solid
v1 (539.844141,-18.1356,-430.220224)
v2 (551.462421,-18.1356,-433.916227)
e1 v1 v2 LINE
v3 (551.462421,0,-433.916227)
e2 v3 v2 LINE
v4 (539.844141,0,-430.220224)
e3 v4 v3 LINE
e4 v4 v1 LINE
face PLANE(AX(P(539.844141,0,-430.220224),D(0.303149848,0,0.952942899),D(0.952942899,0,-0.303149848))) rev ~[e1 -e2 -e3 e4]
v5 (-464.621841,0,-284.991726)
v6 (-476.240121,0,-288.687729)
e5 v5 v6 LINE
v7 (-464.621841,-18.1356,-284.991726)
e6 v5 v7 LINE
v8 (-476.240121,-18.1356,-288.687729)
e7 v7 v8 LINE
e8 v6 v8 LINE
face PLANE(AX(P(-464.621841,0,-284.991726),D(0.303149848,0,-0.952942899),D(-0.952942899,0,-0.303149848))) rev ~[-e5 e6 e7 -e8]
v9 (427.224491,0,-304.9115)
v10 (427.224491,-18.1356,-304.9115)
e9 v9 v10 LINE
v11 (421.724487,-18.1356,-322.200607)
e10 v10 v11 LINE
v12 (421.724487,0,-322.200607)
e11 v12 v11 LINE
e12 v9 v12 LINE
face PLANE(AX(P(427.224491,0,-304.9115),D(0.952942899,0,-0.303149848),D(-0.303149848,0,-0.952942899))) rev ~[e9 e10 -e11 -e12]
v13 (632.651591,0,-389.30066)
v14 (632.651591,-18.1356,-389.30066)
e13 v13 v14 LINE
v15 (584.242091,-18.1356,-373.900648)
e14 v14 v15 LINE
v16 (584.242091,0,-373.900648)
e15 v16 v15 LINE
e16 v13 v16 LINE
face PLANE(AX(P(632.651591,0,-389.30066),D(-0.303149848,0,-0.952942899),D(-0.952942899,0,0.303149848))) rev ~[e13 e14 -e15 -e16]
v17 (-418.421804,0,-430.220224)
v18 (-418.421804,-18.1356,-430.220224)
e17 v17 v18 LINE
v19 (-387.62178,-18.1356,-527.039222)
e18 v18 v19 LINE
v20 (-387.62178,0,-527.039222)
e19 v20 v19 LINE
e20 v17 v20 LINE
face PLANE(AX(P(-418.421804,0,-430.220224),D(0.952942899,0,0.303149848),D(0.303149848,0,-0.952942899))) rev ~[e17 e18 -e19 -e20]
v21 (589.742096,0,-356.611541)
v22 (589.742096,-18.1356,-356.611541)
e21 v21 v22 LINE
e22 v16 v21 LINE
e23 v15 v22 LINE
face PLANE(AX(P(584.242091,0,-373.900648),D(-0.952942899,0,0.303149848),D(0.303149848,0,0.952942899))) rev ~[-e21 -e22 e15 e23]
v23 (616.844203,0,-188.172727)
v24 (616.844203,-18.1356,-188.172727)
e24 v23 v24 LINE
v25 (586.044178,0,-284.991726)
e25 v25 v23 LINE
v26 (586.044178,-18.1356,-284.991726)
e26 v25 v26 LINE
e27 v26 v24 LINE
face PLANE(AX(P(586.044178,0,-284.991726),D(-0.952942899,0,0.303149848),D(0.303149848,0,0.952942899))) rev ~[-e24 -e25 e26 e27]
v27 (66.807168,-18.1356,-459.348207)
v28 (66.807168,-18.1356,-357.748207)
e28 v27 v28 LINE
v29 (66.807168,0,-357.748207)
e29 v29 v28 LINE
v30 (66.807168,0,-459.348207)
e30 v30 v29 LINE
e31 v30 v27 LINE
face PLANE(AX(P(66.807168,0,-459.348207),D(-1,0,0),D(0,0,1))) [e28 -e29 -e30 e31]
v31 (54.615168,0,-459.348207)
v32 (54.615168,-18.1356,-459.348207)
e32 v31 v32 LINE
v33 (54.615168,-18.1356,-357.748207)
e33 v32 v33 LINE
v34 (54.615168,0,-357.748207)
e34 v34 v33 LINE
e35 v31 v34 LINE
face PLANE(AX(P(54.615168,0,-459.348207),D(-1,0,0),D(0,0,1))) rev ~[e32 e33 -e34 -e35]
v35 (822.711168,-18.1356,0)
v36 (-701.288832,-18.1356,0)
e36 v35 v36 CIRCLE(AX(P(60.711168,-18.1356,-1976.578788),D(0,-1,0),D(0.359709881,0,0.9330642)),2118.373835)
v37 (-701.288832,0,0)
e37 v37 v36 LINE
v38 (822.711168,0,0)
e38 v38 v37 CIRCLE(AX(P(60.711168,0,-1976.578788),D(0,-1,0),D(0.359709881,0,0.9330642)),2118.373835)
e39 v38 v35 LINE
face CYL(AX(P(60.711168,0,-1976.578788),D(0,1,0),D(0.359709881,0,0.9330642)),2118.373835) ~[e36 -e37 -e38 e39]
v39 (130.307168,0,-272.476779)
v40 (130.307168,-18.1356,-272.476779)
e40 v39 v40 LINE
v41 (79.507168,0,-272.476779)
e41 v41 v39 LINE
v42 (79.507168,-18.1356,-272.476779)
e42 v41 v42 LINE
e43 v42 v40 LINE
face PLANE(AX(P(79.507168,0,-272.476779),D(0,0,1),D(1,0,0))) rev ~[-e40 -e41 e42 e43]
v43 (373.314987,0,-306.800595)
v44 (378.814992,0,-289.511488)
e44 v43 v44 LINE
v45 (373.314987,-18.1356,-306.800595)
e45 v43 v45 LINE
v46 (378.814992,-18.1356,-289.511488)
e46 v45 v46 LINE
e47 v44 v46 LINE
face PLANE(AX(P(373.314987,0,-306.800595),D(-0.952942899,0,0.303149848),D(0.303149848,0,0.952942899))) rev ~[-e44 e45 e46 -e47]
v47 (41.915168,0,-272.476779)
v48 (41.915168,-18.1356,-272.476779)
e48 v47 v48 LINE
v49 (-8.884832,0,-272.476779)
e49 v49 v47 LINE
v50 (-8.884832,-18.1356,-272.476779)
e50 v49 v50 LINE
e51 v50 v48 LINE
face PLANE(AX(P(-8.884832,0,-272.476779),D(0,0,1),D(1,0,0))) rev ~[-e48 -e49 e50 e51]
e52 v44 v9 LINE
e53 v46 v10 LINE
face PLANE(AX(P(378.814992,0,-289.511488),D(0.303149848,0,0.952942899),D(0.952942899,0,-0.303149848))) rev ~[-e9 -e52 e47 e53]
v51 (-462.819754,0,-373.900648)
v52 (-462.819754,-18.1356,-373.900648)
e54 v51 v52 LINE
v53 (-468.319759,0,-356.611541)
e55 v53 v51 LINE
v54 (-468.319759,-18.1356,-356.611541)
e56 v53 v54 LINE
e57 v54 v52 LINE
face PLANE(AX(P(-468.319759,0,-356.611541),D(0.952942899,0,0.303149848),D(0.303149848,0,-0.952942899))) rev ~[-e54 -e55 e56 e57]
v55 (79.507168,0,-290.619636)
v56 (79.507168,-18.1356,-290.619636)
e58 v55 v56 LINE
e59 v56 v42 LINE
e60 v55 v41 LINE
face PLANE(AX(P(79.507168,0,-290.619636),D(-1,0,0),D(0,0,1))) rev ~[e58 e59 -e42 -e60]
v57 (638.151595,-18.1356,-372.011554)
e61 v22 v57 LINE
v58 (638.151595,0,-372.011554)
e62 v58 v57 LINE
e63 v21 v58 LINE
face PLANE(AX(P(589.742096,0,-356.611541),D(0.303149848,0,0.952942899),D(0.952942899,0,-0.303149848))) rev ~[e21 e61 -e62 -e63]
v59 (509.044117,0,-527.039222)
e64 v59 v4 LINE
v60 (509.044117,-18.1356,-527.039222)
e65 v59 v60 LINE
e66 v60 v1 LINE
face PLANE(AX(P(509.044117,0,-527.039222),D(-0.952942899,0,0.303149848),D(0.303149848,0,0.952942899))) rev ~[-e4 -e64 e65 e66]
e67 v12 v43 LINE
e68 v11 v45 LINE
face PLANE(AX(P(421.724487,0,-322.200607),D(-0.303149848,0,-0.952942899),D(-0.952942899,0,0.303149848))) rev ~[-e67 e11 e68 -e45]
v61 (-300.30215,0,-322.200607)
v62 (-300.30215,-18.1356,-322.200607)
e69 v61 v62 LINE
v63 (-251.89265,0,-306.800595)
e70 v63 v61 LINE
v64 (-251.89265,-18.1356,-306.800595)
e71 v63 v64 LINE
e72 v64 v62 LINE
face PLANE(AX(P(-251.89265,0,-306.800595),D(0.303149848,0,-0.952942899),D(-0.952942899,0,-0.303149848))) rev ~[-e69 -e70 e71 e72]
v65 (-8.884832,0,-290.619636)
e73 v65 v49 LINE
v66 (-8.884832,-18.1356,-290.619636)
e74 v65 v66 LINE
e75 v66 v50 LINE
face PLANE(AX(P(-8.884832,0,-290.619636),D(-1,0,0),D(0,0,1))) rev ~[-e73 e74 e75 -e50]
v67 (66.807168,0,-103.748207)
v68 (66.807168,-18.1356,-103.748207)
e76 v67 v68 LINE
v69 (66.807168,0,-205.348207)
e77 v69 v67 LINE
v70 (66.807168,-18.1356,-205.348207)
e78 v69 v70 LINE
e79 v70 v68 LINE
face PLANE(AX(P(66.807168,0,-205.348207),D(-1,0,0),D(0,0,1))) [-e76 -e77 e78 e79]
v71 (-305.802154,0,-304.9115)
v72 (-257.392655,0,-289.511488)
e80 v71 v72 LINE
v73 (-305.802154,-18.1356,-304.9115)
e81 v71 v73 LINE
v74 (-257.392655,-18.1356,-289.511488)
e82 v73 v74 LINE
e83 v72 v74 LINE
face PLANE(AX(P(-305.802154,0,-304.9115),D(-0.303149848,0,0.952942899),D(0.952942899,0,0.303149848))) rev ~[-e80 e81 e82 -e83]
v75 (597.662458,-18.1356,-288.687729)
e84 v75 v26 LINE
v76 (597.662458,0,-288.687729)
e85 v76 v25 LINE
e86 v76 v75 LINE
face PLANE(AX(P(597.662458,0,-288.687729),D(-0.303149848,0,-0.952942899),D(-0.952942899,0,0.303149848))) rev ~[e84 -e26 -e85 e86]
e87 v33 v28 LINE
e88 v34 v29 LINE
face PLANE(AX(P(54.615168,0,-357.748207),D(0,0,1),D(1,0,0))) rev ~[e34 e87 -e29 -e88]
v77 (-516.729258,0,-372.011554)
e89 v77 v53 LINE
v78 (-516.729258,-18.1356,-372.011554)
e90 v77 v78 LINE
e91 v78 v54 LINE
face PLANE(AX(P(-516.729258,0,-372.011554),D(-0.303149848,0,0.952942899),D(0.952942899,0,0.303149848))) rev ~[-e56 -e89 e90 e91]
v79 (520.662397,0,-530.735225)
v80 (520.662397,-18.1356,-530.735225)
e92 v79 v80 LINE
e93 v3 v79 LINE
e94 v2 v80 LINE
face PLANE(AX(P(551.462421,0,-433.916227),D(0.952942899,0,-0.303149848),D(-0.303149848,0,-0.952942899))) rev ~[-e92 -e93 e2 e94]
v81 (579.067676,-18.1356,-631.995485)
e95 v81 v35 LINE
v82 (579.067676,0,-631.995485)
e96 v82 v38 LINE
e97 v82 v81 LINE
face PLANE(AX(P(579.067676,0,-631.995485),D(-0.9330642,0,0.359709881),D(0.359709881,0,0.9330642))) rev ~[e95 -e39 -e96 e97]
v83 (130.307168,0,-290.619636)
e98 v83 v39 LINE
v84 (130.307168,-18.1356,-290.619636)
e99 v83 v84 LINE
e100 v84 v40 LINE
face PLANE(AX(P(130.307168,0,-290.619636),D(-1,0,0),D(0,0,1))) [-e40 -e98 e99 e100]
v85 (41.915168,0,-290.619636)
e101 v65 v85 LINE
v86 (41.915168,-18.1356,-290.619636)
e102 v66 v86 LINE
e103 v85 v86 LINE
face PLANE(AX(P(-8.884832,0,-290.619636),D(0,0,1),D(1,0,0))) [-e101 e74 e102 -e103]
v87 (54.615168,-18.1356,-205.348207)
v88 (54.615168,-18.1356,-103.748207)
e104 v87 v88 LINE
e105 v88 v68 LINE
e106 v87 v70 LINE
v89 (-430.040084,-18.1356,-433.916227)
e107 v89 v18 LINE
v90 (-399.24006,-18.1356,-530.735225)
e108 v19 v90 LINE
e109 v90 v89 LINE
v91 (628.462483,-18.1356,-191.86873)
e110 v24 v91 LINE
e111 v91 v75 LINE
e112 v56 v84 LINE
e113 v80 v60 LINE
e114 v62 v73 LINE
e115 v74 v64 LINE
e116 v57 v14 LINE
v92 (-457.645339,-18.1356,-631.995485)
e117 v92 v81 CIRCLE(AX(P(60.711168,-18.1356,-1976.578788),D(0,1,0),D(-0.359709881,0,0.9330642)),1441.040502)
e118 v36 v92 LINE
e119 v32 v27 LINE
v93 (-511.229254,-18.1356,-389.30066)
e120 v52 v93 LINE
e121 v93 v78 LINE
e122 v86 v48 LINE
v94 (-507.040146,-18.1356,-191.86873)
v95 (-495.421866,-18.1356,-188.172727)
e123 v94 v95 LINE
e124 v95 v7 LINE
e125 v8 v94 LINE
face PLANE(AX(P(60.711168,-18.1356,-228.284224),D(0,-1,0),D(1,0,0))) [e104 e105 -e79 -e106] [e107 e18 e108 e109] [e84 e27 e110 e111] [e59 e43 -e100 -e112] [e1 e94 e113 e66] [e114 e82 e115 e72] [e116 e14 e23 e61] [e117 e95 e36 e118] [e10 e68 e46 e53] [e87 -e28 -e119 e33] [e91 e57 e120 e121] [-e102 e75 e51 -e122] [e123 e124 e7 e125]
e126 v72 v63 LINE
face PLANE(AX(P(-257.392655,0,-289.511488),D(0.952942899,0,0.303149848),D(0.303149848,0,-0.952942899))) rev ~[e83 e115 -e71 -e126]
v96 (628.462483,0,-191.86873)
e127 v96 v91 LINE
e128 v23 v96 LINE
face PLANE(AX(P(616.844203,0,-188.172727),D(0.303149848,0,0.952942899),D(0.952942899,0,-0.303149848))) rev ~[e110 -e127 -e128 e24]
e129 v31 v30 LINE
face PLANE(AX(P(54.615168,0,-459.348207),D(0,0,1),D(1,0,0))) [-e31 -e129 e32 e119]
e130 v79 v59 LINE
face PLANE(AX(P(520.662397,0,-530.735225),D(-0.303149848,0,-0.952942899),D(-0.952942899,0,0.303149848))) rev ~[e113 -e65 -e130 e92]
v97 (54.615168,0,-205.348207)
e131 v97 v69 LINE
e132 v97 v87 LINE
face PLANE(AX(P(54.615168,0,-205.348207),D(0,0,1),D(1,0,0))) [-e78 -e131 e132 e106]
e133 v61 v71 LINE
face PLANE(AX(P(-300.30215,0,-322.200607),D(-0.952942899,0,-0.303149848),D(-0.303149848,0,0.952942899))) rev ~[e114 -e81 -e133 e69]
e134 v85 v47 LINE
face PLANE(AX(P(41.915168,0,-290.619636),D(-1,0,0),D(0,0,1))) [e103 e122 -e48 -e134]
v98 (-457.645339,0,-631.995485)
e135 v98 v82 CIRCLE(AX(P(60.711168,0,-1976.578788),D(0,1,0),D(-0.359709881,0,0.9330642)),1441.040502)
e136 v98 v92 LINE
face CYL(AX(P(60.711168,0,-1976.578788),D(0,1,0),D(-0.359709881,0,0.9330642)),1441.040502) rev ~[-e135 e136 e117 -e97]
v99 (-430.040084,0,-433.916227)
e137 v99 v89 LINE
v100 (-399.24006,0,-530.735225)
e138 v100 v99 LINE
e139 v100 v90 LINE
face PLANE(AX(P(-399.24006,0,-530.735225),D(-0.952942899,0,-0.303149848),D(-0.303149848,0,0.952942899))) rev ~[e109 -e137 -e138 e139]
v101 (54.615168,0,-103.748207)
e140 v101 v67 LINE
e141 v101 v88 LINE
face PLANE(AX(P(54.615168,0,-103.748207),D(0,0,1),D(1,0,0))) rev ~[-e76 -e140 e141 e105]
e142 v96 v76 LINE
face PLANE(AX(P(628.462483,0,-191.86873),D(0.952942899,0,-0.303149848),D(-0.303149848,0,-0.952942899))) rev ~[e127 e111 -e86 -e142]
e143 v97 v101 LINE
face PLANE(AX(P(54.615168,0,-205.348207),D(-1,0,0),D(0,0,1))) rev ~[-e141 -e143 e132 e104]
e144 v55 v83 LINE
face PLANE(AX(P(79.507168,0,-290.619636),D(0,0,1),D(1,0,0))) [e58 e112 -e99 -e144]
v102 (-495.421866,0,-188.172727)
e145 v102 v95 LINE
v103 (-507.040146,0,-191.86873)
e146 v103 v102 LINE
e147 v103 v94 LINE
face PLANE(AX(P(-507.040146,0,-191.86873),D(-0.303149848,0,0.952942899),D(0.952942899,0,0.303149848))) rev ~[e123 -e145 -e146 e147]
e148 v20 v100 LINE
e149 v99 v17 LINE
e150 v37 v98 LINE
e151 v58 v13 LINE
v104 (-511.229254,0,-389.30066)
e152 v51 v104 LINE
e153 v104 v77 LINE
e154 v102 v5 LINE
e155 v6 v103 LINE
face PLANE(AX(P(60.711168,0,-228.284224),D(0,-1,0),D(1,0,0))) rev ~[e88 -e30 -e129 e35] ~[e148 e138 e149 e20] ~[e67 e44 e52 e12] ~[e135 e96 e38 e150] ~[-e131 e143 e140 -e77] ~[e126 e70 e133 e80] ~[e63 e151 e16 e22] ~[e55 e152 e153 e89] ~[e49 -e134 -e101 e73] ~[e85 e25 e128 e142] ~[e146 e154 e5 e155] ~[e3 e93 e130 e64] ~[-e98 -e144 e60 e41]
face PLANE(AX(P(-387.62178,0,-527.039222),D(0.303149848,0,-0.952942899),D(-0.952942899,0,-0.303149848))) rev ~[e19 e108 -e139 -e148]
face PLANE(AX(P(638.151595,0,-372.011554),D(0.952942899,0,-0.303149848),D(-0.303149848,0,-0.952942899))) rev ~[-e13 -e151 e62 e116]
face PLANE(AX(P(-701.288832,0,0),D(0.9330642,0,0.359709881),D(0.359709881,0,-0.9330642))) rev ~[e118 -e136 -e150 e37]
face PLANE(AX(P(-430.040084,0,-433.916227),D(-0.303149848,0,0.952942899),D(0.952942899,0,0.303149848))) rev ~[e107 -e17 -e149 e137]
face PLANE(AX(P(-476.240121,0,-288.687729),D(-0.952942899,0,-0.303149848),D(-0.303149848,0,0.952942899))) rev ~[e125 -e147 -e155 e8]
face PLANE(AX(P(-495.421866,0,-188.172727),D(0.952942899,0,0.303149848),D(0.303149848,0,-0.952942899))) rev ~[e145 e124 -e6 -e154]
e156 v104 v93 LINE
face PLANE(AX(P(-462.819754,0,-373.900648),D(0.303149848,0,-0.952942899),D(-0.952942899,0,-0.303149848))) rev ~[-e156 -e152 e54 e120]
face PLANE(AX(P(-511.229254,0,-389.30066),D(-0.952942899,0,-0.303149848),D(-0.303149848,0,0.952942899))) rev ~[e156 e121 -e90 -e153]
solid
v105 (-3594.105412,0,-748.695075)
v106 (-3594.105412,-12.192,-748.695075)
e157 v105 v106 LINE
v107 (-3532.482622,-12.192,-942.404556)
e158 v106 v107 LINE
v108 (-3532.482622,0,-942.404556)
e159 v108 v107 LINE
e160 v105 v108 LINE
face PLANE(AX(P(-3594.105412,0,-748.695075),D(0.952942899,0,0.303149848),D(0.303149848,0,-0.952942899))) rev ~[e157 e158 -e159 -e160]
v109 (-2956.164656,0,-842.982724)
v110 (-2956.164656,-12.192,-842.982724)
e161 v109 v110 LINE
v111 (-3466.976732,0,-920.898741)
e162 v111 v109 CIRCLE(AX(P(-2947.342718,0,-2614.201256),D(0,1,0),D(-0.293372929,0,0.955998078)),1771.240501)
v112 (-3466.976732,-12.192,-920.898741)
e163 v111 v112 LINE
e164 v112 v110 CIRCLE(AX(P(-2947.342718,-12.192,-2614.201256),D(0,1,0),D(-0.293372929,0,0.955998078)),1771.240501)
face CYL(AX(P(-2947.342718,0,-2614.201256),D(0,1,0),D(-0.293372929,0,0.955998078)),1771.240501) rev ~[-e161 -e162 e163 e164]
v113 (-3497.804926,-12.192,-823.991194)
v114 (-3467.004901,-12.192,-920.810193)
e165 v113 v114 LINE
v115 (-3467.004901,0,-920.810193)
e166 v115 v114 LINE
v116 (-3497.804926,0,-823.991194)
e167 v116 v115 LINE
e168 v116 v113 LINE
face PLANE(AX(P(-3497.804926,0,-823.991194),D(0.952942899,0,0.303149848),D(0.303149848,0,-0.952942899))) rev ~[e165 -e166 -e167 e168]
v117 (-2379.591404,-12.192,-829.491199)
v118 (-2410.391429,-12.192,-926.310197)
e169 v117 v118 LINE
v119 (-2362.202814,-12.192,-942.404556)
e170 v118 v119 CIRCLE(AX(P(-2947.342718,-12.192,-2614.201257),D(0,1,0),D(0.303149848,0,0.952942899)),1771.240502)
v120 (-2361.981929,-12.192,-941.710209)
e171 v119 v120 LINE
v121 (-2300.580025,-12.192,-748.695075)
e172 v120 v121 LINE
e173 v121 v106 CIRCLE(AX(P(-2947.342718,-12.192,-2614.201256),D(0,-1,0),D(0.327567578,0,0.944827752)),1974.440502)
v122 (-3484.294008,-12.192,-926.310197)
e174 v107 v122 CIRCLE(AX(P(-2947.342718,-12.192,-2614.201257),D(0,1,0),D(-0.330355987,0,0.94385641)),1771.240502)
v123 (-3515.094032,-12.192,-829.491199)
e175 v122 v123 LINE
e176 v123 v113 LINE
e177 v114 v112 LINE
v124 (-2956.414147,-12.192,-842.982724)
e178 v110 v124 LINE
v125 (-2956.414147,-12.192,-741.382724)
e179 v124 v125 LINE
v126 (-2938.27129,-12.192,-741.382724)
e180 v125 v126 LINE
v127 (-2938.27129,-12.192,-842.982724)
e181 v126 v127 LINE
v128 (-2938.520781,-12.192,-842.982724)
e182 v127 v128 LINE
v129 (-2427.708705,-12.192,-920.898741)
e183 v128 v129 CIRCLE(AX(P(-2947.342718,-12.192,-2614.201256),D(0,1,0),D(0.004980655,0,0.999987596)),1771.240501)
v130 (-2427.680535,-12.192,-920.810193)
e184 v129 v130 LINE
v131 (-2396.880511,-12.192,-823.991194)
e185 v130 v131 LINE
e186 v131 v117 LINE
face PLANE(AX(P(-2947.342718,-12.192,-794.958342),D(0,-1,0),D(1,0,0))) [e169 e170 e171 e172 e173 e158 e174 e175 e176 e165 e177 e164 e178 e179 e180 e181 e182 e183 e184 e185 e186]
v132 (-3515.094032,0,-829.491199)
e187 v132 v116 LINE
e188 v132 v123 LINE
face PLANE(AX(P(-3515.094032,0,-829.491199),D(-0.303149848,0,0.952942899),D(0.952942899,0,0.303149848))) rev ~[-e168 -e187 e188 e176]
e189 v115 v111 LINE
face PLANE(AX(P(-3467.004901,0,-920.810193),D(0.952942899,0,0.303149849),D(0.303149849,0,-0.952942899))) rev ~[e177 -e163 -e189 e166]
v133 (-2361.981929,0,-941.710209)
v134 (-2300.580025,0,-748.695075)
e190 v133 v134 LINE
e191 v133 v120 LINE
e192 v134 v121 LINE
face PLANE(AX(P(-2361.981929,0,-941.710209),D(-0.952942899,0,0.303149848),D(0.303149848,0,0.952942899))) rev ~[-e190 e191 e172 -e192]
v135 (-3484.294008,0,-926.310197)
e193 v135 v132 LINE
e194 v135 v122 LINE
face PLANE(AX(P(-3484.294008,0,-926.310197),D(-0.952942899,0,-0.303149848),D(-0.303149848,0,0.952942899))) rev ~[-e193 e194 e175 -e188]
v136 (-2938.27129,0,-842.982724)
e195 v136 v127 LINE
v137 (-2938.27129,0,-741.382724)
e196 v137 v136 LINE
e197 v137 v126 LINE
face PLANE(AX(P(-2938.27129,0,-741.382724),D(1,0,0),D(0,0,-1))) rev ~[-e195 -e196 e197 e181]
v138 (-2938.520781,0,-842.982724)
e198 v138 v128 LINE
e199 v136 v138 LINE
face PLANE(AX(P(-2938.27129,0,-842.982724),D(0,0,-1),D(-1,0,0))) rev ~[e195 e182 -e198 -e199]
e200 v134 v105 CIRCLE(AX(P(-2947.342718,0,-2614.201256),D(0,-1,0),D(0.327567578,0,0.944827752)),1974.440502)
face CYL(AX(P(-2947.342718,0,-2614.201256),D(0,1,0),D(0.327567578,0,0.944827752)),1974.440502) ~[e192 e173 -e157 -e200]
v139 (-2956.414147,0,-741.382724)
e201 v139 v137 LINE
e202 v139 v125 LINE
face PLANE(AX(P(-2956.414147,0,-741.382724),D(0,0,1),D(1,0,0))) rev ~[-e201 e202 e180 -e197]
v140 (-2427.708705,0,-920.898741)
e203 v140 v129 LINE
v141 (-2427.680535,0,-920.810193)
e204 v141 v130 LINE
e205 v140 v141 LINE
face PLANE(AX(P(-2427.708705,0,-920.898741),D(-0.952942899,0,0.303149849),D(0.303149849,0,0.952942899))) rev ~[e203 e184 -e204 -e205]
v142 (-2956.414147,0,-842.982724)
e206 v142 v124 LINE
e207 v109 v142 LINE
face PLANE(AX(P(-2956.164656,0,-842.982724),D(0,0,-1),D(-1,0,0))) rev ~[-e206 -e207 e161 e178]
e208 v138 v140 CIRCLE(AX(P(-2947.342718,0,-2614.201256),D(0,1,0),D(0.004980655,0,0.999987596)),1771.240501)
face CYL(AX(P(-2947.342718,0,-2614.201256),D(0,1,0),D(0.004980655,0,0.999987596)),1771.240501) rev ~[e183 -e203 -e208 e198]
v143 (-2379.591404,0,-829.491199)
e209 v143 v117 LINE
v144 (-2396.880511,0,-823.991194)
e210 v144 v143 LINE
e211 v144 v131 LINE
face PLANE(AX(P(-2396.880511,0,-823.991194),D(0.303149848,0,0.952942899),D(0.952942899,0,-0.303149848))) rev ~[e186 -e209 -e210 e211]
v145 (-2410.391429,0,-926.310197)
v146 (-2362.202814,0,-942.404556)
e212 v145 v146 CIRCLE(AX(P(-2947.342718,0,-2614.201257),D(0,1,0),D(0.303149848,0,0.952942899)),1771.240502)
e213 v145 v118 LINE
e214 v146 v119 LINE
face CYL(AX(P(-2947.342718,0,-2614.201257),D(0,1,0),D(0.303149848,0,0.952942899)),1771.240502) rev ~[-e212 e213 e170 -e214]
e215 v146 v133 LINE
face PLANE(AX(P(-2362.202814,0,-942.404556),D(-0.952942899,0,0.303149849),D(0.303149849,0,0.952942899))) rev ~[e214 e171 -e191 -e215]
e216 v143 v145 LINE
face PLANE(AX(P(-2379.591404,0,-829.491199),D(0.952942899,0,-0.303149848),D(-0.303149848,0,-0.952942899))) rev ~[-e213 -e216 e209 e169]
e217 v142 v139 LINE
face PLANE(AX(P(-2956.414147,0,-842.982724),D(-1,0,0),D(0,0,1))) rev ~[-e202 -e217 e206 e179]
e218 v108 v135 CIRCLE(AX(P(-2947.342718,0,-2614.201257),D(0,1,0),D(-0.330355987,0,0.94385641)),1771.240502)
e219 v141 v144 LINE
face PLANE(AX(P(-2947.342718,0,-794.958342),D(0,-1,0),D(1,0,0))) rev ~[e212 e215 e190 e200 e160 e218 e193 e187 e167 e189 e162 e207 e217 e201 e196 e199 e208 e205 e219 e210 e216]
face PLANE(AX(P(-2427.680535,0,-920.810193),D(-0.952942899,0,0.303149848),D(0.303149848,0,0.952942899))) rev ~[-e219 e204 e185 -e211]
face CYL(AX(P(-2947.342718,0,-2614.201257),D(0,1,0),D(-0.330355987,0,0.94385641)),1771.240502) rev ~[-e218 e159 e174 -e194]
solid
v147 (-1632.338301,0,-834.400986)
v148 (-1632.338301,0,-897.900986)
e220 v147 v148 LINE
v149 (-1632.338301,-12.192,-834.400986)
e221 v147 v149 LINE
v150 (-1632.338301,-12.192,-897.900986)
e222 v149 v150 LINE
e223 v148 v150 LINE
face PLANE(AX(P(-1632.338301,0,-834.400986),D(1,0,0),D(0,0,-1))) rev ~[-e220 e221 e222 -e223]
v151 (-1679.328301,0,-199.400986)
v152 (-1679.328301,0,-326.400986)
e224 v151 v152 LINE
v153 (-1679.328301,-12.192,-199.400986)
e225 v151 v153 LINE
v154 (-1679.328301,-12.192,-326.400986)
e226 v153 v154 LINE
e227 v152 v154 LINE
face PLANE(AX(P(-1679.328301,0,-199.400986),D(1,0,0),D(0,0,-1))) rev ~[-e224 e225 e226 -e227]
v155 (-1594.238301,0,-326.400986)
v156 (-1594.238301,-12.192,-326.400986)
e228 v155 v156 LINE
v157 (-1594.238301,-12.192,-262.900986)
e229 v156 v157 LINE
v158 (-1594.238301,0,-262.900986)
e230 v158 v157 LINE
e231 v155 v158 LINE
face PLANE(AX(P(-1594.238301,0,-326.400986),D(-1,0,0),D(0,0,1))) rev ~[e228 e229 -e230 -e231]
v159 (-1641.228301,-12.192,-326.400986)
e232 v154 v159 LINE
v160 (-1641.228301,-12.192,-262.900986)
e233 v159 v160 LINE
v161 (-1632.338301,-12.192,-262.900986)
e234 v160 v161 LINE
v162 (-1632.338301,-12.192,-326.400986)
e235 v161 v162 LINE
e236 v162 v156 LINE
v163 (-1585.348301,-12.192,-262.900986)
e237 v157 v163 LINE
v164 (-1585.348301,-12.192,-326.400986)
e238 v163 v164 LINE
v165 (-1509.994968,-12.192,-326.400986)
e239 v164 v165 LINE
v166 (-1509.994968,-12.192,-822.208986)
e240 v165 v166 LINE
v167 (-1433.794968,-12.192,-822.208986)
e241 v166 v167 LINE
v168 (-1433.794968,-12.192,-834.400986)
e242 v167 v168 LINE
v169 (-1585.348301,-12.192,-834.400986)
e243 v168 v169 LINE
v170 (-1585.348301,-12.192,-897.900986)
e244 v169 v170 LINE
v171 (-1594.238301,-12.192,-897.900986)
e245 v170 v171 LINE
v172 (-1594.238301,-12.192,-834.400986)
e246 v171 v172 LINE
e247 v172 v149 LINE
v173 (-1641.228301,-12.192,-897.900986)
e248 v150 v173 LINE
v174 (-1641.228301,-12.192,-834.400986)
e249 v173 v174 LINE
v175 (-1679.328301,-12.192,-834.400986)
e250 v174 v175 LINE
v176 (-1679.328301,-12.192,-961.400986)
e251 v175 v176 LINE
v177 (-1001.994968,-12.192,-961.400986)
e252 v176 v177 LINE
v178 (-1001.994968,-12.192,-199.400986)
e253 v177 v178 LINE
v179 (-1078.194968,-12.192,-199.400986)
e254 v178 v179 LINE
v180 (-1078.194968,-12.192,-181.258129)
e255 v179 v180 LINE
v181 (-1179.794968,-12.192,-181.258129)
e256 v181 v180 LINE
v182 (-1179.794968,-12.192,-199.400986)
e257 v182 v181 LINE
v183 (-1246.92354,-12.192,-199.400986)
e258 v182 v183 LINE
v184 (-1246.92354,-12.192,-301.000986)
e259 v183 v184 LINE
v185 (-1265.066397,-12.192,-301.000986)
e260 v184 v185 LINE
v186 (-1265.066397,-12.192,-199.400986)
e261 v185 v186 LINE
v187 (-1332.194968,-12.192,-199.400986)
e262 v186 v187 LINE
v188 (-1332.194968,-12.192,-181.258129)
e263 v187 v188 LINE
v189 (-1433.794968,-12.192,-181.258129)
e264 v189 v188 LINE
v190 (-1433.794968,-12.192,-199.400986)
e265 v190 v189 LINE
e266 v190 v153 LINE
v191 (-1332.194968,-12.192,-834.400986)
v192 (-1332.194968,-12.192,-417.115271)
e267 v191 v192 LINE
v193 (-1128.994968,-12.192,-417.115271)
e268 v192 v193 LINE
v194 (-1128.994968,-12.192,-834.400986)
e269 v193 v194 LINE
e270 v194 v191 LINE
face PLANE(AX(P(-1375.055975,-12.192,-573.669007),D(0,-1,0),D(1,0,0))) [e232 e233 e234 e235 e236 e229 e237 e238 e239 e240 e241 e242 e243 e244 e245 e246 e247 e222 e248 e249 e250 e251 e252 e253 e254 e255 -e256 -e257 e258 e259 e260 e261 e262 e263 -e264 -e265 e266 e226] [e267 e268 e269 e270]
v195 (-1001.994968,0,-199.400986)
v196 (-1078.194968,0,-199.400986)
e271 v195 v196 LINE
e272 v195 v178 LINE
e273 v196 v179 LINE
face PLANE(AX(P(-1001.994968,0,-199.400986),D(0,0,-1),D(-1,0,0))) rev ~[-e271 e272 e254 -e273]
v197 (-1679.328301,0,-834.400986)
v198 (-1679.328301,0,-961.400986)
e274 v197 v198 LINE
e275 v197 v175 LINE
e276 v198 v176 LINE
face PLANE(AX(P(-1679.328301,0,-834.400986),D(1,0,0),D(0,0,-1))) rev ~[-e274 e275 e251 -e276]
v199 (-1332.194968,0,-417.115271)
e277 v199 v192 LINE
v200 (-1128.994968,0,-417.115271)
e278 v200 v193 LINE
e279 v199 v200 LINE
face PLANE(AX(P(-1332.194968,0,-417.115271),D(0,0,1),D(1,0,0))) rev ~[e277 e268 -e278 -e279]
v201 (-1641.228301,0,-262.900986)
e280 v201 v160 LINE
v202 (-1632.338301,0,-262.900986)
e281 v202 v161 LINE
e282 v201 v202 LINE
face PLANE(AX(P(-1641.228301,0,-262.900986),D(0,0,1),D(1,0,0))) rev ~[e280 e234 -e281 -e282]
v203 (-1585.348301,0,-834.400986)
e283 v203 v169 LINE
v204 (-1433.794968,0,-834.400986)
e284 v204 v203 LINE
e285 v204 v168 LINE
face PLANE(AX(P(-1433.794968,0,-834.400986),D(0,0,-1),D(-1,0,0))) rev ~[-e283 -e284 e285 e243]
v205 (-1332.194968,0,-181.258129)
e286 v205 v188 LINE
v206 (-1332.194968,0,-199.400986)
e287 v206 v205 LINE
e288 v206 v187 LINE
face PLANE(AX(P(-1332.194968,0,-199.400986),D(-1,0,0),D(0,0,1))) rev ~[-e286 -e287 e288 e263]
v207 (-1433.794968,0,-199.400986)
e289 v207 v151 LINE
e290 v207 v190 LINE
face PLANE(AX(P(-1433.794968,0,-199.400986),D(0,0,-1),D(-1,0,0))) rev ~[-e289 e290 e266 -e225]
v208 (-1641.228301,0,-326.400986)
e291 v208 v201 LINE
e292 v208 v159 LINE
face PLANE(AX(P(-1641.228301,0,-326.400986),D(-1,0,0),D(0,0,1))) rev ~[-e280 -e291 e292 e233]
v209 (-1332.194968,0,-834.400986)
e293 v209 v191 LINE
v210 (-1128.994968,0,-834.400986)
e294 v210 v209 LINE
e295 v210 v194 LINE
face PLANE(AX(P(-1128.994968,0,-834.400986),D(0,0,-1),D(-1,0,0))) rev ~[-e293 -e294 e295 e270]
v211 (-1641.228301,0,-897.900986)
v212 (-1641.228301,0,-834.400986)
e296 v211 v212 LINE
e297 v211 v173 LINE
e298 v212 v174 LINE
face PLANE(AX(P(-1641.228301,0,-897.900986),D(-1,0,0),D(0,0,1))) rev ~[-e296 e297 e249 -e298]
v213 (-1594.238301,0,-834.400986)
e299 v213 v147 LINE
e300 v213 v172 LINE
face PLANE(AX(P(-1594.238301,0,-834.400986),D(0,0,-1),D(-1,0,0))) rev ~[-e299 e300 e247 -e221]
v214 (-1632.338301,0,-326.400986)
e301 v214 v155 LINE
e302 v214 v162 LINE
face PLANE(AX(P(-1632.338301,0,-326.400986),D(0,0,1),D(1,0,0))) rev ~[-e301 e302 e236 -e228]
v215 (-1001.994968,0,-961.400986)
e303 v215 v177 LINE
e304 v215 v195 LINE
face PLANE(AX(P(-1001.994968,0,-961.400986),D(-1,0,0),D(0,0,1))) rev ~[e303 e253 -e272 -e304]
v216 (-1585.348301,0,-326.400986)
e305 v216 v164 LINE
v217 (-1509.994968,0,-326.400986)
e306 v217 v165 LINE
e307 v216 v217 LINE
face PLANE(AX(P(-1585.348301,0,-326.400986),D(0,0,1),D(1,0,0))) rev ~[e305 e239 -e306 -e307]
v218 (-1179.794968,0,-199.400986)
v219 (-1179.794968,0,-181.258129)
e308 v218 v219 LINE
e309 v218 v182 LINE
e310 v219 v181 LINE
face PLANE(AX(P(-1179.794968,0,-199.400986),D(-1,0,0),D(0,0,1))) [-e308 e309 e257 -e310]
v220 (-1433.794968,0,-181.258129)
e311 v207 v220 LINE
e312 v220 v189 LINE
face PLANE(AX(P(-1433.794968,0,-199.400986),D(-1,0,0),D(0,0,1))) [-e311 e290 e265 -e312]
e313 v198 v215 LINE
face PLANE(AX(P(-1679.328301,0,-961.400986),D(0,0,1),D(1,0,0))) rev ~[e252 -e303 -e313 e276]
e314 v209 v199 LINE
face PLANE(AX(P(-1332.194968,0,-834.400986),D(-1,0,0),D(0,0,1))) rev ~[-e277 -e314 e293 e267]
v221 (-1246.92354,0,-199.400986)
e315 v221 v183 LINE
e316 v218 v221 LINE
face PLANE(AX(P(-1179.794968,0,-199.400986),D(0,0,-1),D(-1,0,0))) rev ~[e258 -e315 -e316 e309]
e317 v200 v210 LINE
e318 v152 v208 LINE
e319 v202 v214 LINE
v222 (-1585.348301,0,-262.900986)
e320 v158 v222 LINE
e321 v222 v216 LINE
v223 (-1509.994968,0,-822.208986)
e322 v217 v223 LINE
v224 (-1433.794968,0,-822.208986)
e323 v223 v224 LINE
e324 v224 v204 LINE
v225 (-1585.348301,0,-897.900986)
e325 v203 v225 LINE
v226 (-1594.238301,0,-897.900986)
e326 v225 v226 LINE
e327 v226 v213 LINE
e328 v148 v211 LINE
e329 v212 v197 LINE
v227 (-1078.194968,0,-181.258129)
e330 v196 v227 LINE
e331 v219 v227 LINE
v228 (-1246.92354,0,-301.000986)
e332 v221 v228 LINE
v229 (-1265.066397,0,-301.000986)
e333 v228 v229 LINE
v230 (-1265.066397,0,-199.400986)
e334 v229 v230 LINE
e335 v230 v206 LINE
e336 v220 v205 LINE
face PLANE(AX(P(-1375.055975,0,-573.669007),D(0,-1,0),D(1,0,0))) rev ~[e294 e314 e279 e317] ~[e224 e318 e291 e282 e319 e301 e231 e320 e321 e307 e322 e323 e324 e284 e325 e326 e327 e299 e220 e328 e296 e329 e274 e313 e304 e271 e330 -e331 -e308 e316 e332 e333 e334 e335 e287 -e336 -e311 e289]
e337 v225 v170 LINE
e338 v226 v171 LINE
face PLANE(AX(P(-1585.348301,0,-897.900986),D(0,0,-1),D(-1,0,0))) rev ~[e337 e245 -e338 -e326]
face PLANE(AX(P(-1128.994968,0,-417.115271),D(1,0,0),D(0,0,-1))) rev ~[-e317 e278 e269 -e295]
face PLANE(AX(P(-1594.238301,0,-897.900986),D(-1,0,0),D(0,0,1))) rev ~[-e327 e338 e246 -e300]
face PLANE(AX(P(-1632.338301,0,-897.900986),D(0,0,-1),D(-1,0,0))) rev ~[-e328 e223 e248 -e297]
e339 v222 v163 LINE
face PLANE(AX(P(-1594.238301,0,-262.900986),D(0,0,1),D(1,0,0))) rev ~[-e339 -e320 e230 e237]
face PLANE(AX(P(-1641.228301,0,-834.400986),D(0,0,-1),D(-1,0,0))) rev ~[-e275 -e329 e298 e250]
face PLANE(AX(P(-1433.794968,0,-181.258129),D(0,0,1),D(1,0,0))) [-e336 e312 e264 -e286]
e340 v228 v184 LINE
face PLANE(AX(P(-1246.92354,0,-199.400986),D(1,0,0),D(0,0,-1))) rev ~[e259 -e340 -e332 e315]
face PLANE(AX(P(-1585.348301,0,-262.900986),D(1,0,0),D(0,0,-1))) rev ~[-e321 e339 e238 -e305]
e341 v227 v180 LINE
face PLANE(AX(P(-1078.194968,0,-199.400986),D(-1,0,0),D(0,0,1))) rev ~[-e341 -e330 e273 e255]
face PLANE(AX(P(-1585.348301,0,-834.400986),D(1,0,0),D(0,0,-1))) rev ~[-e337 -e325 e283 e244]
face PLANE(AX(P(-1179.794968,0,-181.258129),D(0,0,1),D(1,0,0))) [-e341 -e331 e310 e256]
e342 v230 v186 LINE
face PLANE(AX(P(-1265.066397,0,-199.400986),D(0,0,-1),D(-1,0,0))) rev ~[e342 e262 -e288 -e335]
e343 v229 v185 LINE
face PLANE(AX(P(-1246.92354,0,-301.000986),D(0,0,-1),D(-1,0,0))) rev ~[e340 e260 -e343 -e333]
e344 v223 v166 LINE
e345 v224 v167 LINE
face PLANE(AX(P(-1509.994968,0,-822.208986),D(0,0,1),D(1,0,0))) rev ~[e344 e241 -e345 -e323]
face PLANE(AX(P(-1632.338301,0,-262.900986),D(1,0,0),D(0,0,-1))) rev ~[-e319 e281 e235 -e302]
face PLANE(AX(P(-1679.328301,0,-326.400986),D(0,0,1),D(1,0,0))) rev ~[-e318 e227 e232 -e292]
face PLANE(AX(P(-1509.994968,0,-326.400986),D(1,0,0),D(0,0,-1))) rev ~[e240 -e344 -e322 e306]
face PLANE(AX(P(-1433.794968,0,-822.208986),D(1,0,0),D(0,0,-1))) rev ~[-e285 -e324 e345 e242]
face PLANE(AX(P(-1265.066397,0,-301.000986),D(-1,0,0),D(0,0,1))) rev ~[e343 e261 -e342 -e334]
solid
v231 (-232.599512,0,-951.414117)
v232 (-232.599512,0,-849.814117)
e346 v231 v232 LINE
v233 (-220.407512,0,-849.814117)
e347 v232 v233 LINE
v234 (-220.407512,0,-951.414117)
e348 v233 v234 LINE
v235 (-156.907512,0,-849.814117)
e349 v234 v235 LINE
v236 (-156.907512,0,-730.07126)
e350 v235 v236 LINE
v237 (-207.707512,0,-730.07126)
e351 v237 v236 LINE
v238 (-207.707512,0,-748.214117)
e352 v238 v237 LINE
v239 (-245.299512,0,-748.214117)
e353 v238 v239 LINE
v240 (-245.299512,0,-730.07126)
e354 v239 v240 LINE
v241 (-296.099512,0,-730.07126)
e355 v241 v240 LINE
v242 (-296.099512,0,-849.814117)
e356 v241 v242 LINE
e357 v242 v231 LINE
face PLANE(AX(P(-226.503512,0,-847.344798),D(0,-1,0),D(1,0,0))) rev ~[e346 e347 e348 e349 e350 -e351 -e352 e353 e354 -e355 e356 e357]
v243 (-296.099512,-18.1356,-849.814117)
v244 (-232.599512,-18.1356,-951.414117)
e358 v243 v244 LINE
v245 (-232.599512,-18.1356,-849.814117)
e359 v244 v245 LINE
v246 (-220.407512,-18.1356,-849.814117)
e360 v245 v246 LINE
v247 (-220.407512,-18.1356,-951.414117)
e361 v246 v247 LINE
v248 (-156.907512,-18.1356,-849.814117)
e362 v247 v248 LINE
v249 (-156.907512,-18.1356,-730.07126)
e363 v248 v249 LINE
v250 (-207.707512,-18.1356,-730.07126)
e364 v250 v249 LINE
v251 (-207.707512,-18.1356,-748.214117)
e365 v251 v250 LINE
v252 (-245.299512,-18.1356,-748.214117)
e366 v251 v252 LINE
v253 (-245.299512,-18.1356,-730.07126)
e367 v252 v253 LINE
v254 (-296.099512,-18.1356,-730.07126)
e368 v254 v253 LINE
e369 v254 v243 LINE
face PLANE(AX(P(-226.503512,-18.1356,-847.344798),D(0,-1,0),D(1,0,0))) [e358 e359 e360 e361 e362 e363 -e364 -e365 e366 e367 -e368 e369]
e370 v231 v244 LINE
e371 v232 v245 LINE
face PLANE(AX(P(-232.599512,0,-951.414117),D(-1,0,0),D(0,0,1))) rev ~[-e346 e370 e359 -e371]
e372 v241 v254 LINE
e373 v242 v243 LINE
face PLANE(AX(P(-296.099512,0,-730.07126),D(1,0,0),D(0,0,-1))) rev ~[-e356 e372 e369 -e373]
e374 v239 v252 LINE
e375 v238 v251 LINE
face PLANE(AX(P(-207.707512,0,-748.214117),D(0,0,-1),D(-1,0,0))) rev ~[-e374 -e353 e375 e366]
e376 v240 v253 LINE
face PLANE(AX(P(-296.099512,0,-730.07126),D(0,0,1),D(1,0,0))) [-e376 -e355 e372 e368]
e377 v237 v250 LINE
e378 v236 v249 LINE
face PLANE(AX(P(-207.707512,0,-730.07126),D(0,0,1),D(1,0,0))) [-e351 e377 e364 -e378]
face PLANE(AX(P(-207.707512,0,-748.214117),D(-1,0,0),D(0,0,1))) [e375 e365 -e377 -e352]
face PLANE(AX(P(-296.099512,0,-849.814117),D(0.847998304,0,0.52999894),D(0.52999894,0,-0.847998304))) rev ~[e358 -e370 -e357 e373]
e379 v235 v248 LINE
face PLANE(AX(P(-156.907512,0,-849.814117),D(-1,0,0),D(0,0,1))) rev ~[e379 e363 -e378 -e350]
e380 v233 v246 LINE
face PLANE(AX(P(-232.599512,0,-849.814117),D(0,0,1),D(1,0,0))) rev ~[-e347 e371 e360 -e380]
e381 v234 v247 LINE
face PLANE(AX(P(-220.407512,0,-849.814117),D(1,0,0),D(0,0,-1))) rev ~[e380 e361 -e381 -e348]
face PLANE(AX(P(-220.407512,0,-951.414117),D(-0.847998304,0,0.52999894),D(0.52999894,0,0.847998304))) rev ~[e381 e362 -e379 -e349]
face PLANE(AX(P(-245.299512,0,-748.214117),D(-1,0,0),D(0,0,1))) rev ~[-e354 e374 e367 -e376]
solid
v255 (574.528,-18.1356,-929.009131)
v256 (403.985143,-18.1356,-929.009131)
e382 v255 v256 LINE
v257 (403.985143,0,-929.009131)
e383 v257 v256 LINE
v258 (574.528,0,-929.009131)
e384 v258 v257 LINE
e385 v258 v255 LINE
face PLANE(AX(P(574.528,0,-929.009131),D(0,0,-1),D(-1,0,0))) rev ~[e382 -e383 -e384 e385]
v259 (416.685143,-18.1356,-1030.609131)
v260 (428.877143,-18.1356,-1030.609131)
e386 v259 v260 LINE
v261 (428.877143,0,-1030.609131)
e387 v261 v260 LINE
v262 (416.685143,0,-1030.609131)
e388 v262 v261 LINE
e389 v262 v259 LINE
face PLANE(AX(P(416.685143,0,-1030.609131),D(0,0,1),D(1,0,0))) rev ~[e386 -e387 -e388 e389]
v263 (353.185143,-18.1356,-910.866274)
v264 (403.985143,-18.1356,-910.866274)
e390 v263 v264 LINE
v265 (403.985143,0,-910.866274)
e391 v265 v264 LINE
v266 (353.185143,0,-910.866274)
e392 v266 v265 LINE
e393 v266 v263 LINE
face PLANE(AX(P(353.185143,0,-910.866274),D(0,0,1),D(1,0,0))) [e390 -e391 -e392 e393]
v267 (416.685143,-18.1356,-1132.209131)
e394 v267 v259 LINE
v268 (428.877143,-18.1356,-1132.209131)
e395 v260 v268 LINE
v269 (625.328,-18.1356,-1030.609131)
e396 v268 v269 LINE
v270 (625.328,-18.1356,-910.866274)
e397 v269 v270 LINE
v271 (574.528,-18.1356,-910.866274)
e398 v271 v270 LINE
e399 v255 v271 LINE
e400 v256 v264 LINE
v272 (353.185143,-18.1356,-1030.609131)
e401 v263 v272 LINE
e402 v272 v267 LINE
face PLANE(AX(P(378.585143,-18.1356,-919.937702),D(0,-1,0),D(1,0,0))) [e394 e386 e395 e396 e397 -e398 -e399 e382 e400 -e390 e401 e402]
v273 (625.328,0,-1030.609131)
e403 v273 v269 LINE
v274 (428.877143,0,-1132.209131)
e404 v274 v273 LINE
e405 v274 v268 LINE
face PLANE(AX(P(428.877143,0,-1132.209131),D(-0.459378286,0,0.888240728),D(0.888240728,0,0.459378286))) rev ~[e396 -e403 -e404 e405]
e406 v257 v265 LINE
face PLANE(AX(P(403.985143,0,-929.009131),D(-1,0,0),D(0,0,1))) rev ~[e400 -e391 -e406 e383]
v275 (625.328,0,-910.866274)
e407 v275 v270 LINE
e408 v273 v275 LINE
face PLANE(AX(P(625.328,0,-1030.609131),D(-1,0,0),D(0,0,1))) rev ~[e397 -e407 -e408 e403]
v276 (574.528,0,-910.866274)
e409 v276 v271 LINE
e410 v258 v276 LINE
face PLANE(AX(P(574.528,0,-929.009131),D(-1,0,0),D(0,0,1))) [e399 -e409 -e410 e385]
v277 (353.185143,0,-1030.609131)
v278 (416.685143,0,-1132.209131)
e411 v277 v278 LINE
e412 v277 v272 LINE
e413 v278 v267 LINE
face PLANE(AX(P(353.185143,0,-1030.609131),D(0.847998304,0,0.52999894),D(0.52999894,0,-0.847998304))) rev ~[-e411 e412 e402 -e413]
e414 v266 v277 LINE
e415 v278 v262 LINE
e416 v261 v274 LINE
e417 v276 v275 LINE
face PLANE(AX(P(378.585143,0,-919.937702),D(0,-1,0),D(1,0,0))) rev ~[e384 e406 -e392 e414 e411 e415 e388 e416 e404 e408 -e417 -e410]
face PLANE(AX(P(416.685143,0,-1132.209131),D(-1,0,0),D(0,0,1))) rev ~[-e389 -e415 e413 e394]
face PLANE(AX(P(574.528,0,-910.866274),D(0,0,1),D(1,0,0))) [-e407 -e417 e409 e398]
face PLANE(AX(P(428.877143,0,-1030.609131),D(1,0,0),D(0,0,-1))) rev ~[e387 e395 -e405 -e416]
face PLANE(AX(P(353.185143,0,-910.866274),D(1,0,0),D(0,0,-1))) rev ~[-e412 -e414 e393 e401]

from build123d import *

# Parameters (mm, degrees)
F0_W     = 50.8
F0_H     = 18.1428571429
F1_DEPTH = 18.1356
F0_W_2   = 12.192
F0_H_2   = 101.6
F2_DEPTH = 12.192
F0_W_3   = 101.6


# Not quite as in the source:
# - a feature names something its author has since deleted; it is built from what else it names


with BuildPart() as f1:
    # F0 (on Front) → F1 (new body)
    with BuildSketch(Plane.XZ):
        Polygon((-245.2995117426, -748.2141169548), (-296.0995117426, -748.2141169548), (-296.0995117426, -849.8141169548), (-232.5995117426, -951.4141169548), (-232.5995117426, -849.8141169548), (-220.4075117426, -849.8141169548), (-220.4075117426, -951.4141169548), (-156.9075117426, -849.8141169548), (-156.9075117426, -748.2141169548), (-207.7075117426, -748.2141169548), align=None)
        with Locations((-182.3075117426, -739.1426883834)):
            Rectangle(F0_W, F0_H)
        with Locations((-270.6995117426, -739.1426883834)):
            Rectangle(F0_W, F0_H)
    extrude(amount=F1_DEPTH)


with BuildPart() as f1b:
    # F0 (on Front) → F1, piece 2 (new body)
    with BuildSketch(Plane.XZ):
        with BuildLine():
            Line((579.0676757709, -631.9954848741), (822.7111684876, 0))
            ThreePointArc((822.7111684876, 0), (60.7111684876, 141.7950471023), (-701.2888315124, 0))
            Line((-701.2888315124, 0), (-457.6453387957, -631.9954848741))
            ThreePointArc((-457.6453387957, -631.9954848741), (60.7111684876, -535.538286231), (579.0676757709, -631.9954848741))
        make_face()
        Polygon((-399.2400596646, -530.7352252686), (-430.0400842711, -433.9162266978), (-418.4218044426, -430.220223745), (-387.6217798361, -527.0392223158), align=None, mode=Mode.SUBTRACT)
        Polygon((-511.2292535926, -389.3006604553), (-516.7292579866, -372.0115535677), (-468.3197587013, -356.6115412645), (-462.8197543072, -373.9006481521), align=None, mode=Mode.SUBTRACT)
        Polygon((-464.6218413522, -284.9917258889), (-476.2401211807, -288.6877288417), (-507.0401457871, -191.8687302709), (-495.4218659586, -188.1727273182), align=None, mode=Mode.SUBTRACT)
        with Locations((60.7111684876, -408.5482073413)):
            Rectangle(F0_W_2, F0_H_2, mode=Mode.SUBTRACT)
        Polygon((539.8441414177, -430.220223745), (551.4624212462, -433.9162266978), (520.6623966398, -530.7352252686), (509.0441168113, -527.0392223158), align=None, mode=Mode.SUBTRACT)
        Polygon((589.7420956764, -356.6115412645), (638.1515949618, -372.0115535677), (632.6515905678, -389.3006604553), (584.2420912824, -373.9006481521), align=None, mode=Mode.SUBTRACT)
        Polygon((-300.3021495635, -322.2006068485), (-305.8021539575, -304.9114999608), (-257.3926546721, -289.5114876576), (-251.8926502781, -306.8005945453), align=None, mode=Mode.SUBTRACT)
        with Locations((16.5151684876, -281.5482073413)):
            Rectangle(F0_W, F0_H, mode=Mode.SUBTRACT)
        with Locations((104.9071684876, -281.5482073413)):
            Rectangle(F0_W, F0_H, mode=Mode.SUBTRACT)
        Polygon((373.3149872532, -306.8005945453), (378.8149916472, -289.5114876576), (427.2244909326, -304.9114999608), (421.7244865386, -322.2006068485), align=None, mode=Mode.SUBTRACT)
        Polygon((628.4624827623, -191.8687302709), (597.6624581558, -288.6877288417), (586.0441783273, -284.9917258889), (616.8442029338, -188.1727273182), align=None, mode=Mode.SUBTRACT)
        with Locations((60.7111684876, -154.5482073413)):
            Rectangle(F0_W_2, F0_H_2, mode=Mode.SUBTRACT)
    extrude(amount=F1_DEPTH)


with BuildPart() as f1c:
    # F0 (on Front) → F1, piece 3 (new body)
    with BuildSketch(Plane.XZ):
        with Locations((378.5851431642, -919.9377022879)):
            Rectangle(F0_W, F0_H)
        Polygon((403.9851431642, -929.0091308594), (353.1851431642, -929.0091308594), (353.1851431642, -1030.6091308594), (416.6851431642, -1132.2091308594), (416.6851431642, -1030.6091308594), (428.8771431642, -1030.6091308594), (428.8771431642, -1132.2091308594), (625.3280003071, -1030.6091308594), (625.3280003071, -929.0091308594), (574.5280003071, -929.0091308594), align=None)
        with Locations((599.9280003071, -919.9377022879)):
            Rectangle(F0_W, F0_H)
    extrude(amount=F1_DEPTH)


with BuildPart() as f2:
    # F0 (on Front) → F2 (new body)
    with BuildSketch(Plane.XZ):
        with BuildLine():
            Line((-2956.4141467797, -741.3827241583), (-2938.2712896368, -741.3827241583))
            Line((-2938.2712896368, -741.3827241583), (-2938.2712896368, -842.9827241583))
            Line((-2938.2712896368, -842.9827241583), (-2938.5207805782, -842.9827241583))
            ThreePointArc((-2938.5207805782, -842.9827241583), (-2680.2581818501, -863.2133164178), (-2427.7087045022, -920.8987414075))
            Line((-2427.7087045022, -920.8987414075), (-2427.6805354276, -920.8101927253))
            Line((-2427.6805354276, -920.8101927253), (-2396.8805108212, -823.9911941546))
            Line((-2396.8805108212, -823.9911941546), (-2379.5914039336, -829.4911985486))
            Line((-2379.5914039336, -829.4911985486), (-2410.39142854, -926.3101971193))
            ThreePointArc((-2410.39142854, -926.3101971193), (-2386.2394133775, -934.184590775), (-2362.202814439, -942.4045556973))
            Line((-2362.202814439, -942.4045556973), (-2361.9819292546, -941.7102094226))
            Line((-2361.9819292546, -941.7102094226), (-2331.1819046482, -844.8912108518))
            Line((-2331.1819046482, -844.8912108518), (-2300.5800248164, -748.6950747267))
            ThreePointArc((-2300.5800248164, -748.6950747267), (-2947.3427182083, -639.7607545087), (-3594.1054116001, -748.6950747267))
            Line((-3594.1054116001, -748.6950747267), (-3532.4826219776, -942.4045556973))
            ThreePointArc((-3532.4826219776, -942.4045556973), (-3508.446023039, -934.184590775), (-3484.2940078765, -926.3101971193))
            Line((-3484.2940078765, -926.3101971193), (-3515.0940324829, -829.4911985486))
            Line((-3515.0940324829, -829.4911985486), (-3497.8049255953, -823.9911941546))
            Line((-3497.8049255953, -823.9911941546), (-3467.0049009889, -920.8101927253))
            Line((-3467.0049009889, -920.8101927253), (-3466.9767319143, -920.8987414075))
            ThreePointArc((-3466.9767319143, -920.8987414075), (-3214.4272545664, -863.2133164178), (-2956.1646558383, -842.9827241583))
            Line((-2956.1646558383, -842.9827241583), (-2956.4141467797, -842.9827241583))
            Line((-2956.4141467797, -842.9827241583), (-2956.4141467797, -741.3827241583))
        make_face()
    extrude(amount=F2_DEPTH)


with BuildPart() as f2b:
    # F0 (on Front) → F2, piece 2 (new body)
    with BuildSketch(Plane.XZ):
        Polygon((-1433.7949680964, -199.4009857178), (-1509.9949680964, -199.4009857178), (-1679.3283014297, -199.4009857178), (-1679.3283014297, -326.4009857178), (-1641.2283014297, -326.4009857178), (-1641.2283014297, -262.9009857178), (-1632.3383014297, -262.9009857178), (-1632.3383014297, -326.4009857178), (-1594.2383014297, -326.4009857178), (-1594.2383014297, -262.9009857178), (-1585.3483014297, -262.9009857178), (-1585.3483014297, -326.4009857178), (-1509.9949680964, -326.4009857178), (-1509.9949680964, -822.2089857178), (-1433.7949680964, -822.2089857178), (-1433.7949680964, -834.4009857178), (-1509.9949680964, -834.4009857178), (-1585.3483014297, -834.4009857178), (-1585.3483014297, -897.9009857178), (-1594.2383014297, -897.9009857178), (-1594.2383014297, -834.4009857178), (-1632.3383014297, -834.4009857178), (-1632.3383014297, -897.9009857178), (-1641.2283014297, -897.9009857178), (-1641.2283014297, -834.4009857178), (-1679.3283014297, -834.4009857178), (-1679.3283014297, -961.4009857178), (-1509.9949680964, -961.4009857178), (-1001.9949680964, -961.4009857178), (-1001.9949680964, -199.4009857178), (-1078.1949680964, -199.4009857178), (-1179.7949680964, -199.4009857178), (-1246.923539525, -199.4009857178), (-1246.923539525, -301.0009857178), (-1265.0663966678, -301.0009857178), (-1265.0663966678, -199.4009857178), (-1332.1949680964, -199.4009857178), align=None)
        Polygon((-1332.1949680964, -815.8589857178), (-1332.1949680964, -417.1152714321), (-1128.9949680964, -417.1152714321), (-1128.9949680964, -834.4009857178), (-1332.1949680964, -834.4009857178), align=None, mode=Mode.SUBTRACT)
        with Locations((-1382.9949680964, -190.3295571463)):
            Rectangle(F0_W_3, F0_H)
        with Locations((-1128.9949680964, -190.3295571463)):
            Rectangle(F0_W_3, F0_H)
    extrude(amount=F2_DEPTH)


solid = Compound([f1.part, f1b.part, f1c.part, f2.part, f2b.part])
